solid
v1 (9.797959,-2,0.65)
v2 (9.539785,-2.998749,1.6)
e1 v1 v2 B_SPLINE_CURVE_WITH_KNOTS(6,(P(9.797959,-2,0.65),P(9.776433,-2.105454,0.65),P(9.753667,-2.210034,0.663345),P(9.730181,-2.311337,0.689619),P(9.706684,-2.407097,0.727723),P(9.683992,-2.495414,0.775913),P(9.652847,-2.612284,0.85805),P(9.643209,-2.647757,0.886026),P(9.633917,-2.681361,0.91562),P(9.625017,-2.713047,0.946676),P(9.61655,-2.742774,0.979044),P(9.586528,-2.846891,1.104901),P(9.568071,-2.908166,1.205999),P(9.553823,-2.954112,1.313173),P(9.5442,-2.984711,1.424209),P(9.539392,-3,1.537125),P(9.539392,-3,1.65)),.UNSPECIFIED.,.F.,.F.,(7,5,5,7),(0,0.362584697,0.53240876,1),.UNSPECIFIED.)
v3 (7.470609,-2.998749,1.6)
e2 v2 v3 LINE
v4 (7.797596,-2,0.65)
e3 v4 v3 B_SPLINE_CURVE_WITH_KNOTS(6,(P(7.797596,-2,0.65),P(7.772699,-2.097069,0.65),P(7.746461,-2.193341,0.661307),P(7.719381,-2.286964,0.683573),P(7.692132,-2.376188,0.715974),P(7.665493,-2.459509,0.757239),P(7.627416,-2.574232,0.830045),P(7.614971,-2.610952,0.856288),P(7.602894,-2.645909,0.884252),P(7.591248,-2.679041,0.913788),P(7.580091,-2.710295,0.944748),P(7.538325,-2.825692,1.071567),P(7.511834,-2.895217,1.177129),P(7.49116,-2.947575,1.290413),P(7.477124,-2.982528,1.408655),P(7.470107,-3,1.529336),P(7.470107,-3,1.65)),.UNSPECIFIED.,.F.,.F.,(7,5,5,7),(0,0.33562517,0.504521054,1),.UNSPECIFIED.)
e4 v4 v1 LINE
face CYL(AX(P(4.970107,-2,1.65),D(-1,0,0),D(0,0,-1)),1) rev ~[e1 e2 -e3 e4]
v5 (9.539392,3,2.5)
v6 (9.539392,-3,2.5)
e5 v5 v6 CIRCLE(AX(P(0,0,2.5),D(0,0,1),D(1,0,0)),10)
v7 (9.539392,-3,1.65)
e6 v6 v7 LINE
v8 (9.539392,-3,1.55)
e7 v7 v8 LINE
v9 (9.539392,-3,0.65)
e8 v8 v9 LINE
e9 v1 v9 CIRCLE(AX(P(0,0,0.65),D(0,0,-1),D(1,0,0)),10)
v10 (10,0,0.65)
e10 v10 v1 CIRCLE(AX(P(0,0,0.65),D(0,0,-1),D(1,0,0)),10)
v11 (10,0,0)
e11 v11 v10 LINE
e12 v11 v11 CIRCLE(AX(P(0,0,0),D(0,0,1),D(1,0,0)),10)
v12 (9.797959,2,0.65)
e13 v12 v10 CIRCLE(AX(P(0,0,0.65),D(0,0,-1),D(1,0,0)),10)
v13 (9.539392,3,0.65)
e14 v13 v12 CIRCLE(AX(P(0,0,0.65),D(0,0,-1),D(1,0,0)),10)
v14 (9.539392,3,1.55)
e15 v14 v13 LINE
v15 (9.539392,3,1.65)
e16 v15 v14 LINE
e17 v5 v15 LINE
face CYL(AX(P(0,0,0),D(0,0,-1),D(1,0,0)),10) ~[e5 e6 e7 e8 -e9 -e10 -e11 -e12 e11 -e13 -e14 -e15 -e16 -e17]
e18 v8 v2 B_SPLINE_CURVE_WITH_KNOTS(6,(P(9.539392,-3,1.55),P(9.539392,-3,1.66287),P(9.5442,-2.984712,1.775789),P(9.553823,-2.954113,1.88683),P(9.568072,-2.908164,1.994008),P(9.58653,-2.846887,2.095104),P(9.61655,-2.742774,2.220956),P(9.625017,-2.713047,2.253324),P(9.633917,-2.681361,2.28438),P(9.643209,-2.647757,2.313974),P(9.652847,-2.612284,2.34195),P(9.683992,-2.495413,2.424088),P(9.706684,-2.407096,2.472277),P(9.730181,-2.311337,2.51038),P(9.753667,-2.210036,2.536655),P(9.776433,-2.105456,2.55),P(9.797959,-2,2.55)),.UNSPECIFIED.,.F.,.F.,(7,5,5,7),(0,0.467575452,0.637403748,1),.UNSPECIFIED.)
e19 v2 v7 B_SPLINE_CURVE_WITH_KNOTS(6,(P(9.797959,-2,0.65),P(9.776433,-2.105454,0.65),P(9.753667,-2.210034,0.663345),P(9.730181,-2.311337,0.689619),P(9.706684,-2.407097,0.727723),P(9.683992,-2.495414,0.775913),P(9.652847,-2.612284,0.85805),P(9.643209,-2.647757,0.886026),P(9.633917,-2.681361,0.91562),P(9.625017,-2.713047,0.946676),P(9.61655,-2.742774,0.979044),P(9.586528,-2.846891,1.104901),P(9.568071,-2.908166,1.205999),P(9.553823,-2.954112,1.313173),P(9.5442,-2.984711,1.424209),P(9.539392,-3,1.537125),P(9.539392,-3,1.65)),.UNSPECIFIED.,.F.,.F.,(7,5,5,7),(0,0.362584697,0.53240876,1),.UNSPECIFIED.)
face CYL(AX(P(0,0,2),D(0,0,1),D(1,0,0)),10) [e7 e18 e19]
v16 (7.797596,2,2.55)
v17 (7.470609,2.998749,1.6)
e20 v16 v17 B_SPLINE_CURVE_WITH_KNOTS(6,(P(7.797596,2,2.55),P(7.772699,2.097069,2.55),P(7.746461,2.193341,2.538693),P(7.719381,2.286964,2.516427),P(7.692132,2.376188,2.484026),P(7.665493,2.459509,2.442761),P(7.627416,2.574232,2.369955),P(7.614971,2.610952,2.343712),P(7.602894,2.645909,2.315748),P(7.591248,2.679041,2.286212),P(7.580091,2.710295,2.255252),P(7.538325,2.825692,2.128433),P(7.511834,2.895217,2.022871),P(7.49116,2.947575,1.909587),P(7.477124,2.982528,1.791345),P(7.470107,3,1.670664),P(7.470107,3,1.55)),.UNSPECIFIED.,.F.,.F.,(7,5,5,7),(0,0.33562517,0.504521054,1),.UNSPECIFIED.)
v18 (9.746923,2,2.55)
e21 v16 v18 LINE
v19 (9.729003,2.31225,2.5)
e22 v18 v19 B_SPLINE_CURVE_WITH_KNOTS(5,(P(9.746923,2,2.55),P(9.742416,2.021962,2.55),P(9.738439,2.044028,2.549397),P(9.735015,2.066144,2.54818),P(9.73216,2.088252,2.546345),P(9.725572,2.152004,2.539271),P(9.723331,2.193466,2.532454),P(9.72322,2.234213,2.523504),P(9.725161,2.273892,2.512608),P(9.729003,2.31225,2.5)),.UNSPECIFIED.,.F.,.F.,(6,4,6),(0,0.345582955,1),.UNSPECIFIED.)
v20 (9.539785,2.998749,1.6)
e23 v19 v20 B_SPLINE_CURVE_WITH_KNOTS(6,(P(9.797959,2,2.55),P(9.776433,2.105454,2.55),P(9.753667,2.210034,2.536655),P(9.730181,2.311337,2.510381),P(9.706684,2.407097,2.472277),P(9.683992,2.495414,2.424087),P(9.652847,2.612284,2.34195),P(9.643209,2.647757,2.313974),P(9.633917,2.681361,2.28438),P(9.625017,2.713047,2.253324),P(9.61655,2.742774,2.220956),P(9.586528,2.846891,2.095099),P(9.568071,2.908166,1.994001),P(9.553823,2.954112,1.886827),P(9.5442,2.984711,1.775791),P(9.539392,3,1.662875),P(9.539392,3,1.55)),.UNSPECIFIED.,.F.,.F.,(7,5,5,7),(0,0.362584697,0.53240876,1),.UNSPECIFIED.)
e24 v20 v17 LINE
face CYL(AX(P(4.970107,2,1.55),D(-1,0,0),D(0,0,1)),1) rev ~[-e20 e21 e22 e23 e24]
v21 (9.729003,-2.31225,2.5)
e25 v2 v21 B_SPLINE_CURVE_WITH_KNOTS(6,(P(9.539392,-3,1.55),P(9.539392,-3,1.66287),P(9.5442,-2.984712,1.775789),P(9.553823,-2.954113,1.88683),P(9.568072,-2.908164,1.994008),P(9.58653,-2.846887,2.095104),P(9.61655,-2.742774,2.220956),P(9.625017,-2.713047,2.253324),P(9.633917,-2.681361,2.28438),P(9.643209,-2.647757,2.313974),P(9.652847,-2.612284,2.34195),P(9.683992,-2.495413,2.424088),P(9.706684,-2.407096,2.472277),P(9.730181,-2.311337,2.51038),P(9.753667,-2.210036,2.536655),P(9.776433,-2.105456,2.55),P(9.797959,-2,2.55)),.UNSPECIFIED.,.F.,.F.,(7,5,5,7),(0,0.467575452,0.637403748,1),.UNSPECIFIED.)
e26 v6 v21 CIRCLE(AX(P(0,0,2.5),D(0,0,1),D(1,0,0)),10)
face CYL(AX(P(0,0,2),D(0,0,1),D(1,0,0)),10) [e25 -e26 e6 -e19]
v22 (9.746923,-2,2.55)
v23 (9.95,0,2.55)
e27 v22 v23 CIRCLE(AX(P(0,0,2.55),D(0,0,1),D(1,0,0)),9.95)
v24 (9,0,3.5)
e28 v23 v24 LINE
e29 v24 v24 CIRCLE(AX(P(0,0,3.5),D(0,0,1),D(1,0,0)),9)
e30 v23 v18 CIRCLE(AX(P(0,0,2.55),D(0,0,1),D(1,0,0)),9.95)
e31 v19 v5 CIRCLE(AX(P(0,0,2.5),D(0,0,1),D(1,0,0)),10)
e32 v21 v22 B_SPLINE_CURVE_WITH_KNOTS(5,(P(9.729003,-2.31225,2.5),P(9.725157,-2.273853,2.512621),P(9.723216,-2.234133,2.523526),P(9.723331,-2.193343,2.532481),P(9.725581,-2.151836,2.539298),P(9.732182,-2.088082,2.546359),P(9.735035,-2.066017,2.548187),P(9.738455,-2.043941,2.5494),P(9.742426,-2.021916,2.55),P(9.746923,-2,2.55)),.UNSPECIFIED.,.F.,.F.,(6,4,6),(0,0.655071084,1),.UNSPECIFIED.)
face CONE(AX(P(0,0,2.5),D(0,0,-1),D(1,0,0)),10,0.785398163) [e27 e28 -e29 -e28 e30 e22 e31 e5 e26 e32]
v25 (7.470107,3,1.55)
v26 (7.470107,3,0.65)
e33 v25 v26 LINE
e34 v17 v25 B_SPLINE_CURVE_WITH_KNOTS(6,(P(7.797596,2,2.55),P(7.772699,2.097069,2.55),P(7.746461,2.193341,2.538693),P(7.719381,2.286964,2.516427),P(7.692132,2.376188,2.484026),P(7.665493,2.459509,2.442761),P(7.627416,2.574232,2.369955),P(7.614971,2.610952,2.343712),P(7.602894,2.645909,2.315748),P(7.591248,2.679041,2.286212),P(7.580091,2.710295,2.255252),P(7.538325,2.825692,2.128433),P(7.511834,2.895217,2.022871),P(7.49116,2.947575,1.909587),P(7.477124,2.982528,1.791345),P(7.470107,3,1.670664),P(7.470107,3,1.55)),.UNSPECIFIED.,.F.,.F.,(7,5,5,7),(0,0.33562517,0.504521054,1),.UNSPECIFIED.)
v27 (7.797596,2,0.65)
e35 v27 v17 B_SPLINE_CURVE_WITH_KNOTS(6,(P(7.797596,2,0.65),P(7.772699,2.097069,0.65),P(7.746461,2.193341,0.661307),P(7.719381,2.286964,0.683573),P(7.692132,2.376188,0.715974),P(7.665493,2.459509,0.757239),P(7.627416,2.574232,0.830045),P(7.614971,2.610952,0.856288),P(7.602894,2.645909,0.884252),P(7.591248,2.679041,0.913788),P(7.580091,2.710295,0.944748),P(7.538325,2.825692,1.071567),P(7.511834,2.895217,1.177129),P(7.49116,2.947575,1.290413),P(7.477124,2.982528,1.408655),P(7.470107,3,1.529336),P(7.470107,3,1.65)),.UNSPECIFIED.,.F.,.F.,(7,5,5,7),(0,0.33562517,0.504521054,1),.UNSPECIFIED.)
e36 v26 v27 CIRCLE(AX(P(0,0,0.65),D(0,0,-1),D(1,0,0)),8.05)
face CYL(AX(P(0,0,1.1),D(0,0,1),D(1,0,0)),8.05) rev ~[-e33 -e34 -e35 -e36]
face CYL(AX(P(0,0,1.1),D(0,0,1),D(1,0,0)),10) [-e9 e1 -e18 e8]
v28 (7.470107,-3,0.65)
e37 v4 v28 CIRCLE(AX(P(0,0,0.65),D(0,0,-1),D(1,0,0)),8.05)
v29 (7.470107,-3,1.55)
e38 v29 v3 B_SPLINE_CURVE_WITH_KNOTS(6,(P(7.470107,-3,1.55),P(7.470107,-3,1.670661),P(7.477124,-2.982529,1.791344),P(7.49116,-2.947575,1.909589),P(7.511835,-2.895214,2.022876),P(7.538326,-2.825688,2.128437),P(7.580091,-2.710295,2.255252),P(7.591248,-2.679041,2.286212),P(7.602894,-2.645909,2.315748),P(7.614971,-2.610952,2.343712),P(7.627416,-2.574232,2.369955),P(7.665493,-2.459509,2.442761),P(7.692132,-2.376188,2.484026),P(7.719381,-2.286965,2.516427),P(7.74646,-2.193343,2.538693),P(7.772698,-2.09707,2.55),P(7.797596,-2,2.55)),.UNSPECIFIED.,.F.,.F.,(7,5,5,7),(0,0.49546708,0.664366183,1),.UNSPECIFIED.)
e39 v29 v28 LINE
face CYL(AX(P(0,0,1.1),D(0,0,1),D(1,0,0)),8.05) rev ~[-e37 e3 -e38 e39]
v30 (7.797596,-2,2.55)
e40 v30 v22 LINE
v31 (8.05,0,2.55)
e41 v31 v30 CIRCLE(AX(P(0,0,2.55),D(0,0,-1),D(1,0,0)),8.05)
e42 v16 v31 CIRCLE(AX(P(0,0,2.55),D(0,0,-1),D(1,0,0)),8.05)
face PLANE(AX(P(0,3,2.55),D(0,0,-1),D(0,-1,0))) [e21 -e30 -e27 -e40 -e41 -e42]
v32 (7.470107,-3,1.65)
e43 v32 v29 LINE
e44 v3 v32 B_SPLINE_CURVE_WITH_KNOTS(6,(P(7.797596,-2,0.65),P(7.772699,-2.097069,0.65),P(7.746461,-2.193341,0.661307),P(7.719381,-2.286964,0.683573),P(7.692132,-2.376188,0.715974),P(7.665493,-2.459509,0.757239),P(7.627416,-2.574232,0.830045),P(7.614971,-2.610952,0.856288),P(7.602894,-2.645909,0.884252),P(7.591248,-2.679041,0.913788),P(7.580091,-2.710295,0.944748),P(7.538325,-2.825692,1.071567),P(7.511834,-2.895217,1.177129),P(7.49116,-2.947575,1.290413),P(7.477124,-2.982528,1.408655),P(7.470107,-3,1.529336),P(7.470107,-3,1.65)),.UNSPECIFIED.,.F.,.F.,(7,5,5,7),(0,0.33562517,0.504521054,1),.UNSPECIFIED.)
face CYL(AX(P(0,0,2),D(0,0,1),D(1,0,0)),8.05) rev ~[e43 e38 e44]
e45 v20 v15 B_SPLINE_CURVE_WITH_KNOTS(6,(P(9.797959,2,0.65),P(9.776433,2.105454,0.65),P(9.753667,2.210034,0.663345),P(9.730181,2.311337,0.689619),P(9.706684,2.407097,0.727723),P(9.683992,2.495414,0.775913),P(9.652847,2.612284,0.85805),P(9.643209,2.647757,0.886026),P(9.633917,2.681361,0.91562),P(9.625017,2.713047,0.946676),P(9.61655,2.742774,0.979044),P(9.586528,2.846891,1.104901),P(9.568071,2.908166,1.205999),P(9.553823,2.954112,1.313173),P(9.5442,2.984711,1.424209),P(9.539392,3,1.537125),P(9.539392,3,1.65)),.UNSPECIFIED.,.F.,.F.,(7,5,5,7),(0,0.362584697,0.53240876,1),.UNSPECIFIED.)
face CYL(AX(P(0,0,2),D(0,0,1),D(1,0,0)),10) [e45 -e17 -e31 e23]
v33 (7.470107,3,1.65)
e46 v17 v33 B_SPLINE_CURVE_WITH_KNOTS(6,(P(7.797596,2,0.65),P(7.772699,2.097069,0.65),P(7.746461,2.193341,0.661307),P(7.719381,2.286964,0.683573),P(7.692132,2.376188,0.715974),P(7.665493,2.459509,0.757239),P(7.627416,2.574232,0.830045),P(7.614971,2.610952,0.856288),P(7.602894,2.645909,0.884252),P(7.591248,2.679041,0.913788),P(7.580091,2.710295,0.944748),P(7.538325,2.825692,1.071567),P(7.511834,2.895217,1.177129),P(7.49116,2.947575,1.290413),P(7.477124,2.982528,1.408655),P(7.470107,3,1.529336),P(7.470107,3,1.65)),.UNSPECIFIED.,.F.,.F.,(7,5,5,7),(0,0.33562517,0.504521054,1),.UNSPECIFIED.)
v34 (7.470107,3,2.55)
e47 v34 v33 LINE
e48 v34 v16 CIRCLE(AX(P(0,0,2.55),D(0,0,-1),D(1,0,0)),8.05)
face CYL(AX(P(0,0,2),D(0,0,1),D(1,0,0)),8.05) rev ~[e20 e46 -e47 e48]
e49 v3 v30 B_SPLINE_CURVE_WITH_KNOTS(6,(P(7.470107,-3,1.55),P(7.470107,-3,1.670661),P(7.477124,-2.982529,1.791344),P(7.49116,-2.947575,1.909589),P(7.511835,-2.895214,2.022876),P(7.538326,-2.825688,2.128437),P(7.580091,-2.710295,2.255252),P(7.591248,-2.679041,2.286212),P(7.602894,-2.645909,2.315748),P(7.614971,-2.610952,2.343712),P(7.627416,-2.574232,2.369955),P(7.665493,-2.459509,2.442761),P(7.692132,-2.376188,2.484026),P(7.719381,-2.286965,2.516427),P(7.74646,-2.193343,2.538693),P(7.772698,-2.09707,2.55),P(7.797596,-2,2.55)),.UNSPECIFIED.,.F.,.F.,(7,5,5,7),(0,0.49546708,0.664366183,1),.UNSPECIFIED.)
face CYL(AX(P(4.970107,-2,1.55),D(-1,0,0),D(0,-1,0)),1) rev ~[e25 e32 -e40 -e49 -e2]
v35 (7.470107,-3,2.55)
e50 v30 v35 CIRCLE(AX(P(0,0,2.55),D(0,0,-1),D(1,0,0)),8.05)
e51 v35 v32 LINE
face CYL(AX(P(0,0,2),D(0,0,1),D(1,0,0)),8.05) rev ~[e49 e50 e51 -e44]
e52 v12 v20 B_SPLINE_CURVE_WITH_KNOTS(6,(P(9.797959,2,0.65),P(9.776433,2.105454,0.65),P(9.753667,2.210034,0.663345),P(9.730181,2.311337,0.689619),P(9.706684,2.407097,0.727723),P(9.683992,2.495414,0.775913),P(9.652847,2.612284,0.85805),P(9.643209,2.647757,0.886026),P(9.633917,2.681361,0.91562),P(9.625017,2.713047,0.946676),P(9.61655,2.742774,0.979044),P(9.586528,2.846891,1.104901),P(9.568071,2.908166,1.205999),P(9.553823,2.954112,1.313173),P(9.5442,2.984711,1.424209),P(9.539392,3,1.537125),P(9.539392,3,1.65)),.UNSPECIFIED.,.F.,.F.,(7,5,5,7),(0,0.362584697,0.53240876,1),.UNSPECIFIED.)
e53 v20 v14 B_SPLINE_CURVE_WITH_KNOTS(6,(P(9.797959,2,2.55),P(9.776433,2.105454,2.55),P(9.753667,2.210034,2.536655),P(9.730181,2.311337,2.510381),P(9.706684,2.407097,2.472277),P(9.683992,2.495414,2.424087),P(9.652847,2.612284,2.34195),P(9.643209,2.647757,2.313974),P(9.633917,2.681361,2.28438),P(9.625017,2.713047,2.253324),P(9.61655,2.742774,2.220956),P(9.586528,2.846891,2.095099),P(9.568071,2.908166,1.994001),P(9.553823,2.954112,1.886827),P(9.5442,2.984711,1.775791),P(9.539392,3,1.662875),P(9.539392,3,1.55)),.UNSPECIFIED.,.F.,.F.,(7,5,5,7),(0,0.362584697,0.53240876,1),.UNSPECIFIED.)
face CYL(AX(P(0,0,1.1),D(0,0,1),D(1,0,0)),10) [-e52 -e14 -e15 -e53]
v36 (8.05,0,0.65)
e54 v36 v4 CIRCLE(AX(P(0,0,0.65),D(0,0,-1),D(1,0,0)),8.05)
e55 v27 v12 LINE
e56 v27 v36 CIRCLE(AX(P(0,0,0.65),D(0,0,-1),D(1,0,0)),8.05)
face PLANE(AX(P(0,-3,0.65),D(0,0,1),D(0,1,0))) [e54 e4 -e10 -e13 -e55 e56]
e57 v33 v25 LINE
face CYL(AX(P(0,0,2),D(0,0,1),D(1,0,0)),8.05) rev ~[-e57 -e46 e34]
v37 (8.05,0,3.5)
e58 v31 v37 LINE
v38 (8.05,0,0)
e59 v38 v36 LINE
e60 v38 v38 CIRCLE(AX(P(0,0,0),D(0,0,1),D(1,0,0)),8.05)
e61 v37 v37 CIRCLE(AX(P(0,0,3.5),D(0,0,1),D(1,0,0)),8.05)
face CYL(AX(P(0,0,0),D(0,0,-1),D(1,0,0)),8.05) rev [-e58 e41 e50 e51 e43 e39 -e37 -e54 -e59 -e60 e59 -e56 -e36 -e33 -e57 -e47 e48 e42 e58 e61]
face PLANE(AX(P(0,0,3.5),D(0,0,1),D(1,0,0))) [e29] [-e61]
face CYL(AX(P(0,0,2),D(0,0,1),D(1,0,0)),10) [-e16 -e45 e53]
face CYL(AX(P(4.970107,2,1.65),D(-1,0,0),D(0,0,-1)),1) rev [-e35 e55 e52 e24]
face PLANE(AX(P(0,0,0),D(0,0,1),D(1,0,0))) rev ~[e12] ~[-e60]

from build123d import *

# Parameters (mm, degrees)
F0_R         = 10
F0_R_2       = 8.05
F1_DEPTH     = 3.5
F3_DEPTH     = 16.9
F4_T4_DEPTH  = 7.0692849199
F4_S5_R      = 10
F4_T6_DEPTH  = 5
F4_S7_R      = 8.05
F4_T8_DEPTH  = 5
F4_T12_DEPTH = 7.0692849199
F4_S13_R     = 10
F4_T14_DEPTH = 5
F4_S15_R     = 8.05
F4_T16_DEPTH = 5
F4_T20_DEPTH = 7.0692849199
F4_S21_R     = 10
F4_T22_DEPTH = 5
F4_S23_R     = 8.05
F4_T24_DEPTH = 5
F4_T28_DEPTH = 7.0692849199
F4_S29_R     = 10
F4_T30_DEPTH = 5
F4_S31_R     = 8.05
F4_T32_DEPTH = 5


# Not quite as in the source:
# - a fillet or chamfer that OpenCascade refuses, or shapes differently, is made with other operations: its cross-section is extruded or revolved along the edge and cut away or added


with BuildPart() as f1:
    # F0 (on Top) → F1 (new body)
    with BuildSketch(Plane.XY):
        Circle(F0_R)
        Circle(F0_R_2, mode=Mode.SUBTRACT)
    extrude(amount=F1_DEPTH)

    # F2 (on Right) → F3 (cut)
    with BuildSketch(Plane.YZ):
        Polygon((3, 0.65), (3, 2.55), (-3, 2.55), (-3, 0.65), (0, 0.65), align=None)
    extrude(amount=F3_DEPTH, mode=Mode.SUBTRACT)

    # F4: fillet of radius 1 on 4 edges, made by hand


with BuildPart() as f4_tool2:
    # F4_s3 → F4_t4 (new body)
    with BuildSketch(Plane.YZ.offset(4.9701070943)):
        with BuildLine():
            ThreePointArc((2, 2.55), (2.7071067812, 2.2571067812), (3, 1.55))
            Line((3, 1.55), (3, 2.55))
            Line((3, 2.55), (2, 2.55))
        make_face()
    extrude(amount=F4_T4_DEPTH)

    # F4_s5 → F4_t6 (intersect, symmetric)
    with BuildSketch(Plane.XY.offset(2)):
        Circle(F4_S5_R)
    extrude(amount=F4_T6_DEPTH, both=True, mode=Mode.INTERSECT)

    # F4_s7 → F4_t8 (cut, symmetric)
    with BuildSketch(Plane.XY.offset(2)):
        Circle(F4_S7_R)
    extrude(amount=F4_T8_DEPTH, both=True, mode=Mode.SUBTRACT)


with BuildPart() as f1_1:
    add(f1.part)

    # F4_t1: union F4_tool2
    add(f4_tool2.part)


with BuildPart() as f4_tool10:
    # F4_s11 → F4_t12 (new body)
    with BuildSketch(Plane.YZ.offset(4.9701070943)):
        with BuildLine():
            ThreePointArc((2, 0.65), (2.7071067812, 0.9428932188), (3, 1.65))
            Line((3, 1.65), (3, 0.65))
            Line((3, 0.65), (2, 0.65))
        make_face()
    extrude(amount=F4_T12_DEPTH)

    # F4_s13 → F4_t14 (intersect, symmetric)
    with BuildSketch(Plane.XY.offset(1.1)):
        Circle(F4_S13_R)
    extrude(amount=F4_T14_DEPTH, both=True, mode=Mode.INTERSECT)

    # F4_s15 → F4_t16 (cut, symmetric)
    with BuildSketch(Plane.XY.offset(1.1)):
        Circle(F4_S15_R)
    extrude(amount=F4_T16_DEPTH, both=True, mode=Mode.SUBTRACT)


with BuildPart() as f1_2:
    add(f1_1.part)

    # F4_t9: union F4_tool10
    add(f4_tool10.part)


with BuildPart() as f4_tool18:
    # F4_s19 → F4_t20 (new body)
    with BuildSketch(Plane.YZ.offset(4.9701070943)):
        with BuildLine():
            ThreePointArc((-3, 1.55), (-2.7071067812, 2.2571067812), (-2, 2.55))
            Line((-2, 2.55), (-3, 2.55))
            Line((-3, 2.55), (-3, 1.55))
        make_face()
    extrude(amount=F4_T20_DEPTH)

    # F4_s21 → F4_t22 (intersect, symmetric)
    with BuildSketch(Plane.XY.offset(2)):
        Circle(F4_S21_R)
    extrude(amount=F4_T22_DEPTH, both=True, mode=Mode.INTERSECT)

    # F4_s23 → F4_t24 (cut, symmetric)
    with BuildSketch(Plane.XY.offset(2)):
        Circle(F4_S23_R)
    extrude(amount=F4_T24_DEPTH, both=True, mode=Mode.SUBTRACT)


with BuildPart() as f1_3:
    add(f1_2.part)

    # F4_t17: union F4_tool18
    add(f4_tool18.part)


with BuildPart() as f4_tool26:
    # F4_s27 → F4_t28 (new body)
    with BuildSketch(Plane.YZ.offset(4.9701070943)):
        with BuildLine():
            ThreePointArc((-2, 0.65), (-2.7071067812, 0.9428932188), (-3, 1.65))
            Line((-3, 1.65), (-3, 0.65))
            Line((-3, 0.65), (-2, 0.65))
        make_face()
    extrude(amount=F4_T28_DEPTH)

    # F4_s29 → F4_t30 (intersect, symmetric)
    with BuildSketch(Plane.XY.offset(1.1)):
        Circle(F4_S29_R)
    extrude(amount=F4_T30_DEPTH, both=True, mode=Mode.INTERSECT)

    # F4_s31 → F4_t32 (cut, symmetric)
    with BuildSketch(Plane.XY.offset(1.1)):
        Circle(F4_S31_R)
    extrude(amount=F4_T32_DEPTH, both=True, mode=Mode.SUBTRACT)


with BuildPart() as f1_4:
    add(f1_3.part)

    # F4_t25: union F4_tool26
    add(f4_tool26.part)

    # F5: chamfer of 1 on 1 edges, made by hand

    # F5_s1 → F5_t2 (revolve, cut)
    with BuildSketch(Plane.XZ):
        Polygon((10, 2.5), (9, 3.5), (10, 3.5), align=None)
    revolve(axis=Axis((0, 0, 3.5), (0, 0, 1)), mode=Mode.SUBTRACT)


solid = f1_4.part
